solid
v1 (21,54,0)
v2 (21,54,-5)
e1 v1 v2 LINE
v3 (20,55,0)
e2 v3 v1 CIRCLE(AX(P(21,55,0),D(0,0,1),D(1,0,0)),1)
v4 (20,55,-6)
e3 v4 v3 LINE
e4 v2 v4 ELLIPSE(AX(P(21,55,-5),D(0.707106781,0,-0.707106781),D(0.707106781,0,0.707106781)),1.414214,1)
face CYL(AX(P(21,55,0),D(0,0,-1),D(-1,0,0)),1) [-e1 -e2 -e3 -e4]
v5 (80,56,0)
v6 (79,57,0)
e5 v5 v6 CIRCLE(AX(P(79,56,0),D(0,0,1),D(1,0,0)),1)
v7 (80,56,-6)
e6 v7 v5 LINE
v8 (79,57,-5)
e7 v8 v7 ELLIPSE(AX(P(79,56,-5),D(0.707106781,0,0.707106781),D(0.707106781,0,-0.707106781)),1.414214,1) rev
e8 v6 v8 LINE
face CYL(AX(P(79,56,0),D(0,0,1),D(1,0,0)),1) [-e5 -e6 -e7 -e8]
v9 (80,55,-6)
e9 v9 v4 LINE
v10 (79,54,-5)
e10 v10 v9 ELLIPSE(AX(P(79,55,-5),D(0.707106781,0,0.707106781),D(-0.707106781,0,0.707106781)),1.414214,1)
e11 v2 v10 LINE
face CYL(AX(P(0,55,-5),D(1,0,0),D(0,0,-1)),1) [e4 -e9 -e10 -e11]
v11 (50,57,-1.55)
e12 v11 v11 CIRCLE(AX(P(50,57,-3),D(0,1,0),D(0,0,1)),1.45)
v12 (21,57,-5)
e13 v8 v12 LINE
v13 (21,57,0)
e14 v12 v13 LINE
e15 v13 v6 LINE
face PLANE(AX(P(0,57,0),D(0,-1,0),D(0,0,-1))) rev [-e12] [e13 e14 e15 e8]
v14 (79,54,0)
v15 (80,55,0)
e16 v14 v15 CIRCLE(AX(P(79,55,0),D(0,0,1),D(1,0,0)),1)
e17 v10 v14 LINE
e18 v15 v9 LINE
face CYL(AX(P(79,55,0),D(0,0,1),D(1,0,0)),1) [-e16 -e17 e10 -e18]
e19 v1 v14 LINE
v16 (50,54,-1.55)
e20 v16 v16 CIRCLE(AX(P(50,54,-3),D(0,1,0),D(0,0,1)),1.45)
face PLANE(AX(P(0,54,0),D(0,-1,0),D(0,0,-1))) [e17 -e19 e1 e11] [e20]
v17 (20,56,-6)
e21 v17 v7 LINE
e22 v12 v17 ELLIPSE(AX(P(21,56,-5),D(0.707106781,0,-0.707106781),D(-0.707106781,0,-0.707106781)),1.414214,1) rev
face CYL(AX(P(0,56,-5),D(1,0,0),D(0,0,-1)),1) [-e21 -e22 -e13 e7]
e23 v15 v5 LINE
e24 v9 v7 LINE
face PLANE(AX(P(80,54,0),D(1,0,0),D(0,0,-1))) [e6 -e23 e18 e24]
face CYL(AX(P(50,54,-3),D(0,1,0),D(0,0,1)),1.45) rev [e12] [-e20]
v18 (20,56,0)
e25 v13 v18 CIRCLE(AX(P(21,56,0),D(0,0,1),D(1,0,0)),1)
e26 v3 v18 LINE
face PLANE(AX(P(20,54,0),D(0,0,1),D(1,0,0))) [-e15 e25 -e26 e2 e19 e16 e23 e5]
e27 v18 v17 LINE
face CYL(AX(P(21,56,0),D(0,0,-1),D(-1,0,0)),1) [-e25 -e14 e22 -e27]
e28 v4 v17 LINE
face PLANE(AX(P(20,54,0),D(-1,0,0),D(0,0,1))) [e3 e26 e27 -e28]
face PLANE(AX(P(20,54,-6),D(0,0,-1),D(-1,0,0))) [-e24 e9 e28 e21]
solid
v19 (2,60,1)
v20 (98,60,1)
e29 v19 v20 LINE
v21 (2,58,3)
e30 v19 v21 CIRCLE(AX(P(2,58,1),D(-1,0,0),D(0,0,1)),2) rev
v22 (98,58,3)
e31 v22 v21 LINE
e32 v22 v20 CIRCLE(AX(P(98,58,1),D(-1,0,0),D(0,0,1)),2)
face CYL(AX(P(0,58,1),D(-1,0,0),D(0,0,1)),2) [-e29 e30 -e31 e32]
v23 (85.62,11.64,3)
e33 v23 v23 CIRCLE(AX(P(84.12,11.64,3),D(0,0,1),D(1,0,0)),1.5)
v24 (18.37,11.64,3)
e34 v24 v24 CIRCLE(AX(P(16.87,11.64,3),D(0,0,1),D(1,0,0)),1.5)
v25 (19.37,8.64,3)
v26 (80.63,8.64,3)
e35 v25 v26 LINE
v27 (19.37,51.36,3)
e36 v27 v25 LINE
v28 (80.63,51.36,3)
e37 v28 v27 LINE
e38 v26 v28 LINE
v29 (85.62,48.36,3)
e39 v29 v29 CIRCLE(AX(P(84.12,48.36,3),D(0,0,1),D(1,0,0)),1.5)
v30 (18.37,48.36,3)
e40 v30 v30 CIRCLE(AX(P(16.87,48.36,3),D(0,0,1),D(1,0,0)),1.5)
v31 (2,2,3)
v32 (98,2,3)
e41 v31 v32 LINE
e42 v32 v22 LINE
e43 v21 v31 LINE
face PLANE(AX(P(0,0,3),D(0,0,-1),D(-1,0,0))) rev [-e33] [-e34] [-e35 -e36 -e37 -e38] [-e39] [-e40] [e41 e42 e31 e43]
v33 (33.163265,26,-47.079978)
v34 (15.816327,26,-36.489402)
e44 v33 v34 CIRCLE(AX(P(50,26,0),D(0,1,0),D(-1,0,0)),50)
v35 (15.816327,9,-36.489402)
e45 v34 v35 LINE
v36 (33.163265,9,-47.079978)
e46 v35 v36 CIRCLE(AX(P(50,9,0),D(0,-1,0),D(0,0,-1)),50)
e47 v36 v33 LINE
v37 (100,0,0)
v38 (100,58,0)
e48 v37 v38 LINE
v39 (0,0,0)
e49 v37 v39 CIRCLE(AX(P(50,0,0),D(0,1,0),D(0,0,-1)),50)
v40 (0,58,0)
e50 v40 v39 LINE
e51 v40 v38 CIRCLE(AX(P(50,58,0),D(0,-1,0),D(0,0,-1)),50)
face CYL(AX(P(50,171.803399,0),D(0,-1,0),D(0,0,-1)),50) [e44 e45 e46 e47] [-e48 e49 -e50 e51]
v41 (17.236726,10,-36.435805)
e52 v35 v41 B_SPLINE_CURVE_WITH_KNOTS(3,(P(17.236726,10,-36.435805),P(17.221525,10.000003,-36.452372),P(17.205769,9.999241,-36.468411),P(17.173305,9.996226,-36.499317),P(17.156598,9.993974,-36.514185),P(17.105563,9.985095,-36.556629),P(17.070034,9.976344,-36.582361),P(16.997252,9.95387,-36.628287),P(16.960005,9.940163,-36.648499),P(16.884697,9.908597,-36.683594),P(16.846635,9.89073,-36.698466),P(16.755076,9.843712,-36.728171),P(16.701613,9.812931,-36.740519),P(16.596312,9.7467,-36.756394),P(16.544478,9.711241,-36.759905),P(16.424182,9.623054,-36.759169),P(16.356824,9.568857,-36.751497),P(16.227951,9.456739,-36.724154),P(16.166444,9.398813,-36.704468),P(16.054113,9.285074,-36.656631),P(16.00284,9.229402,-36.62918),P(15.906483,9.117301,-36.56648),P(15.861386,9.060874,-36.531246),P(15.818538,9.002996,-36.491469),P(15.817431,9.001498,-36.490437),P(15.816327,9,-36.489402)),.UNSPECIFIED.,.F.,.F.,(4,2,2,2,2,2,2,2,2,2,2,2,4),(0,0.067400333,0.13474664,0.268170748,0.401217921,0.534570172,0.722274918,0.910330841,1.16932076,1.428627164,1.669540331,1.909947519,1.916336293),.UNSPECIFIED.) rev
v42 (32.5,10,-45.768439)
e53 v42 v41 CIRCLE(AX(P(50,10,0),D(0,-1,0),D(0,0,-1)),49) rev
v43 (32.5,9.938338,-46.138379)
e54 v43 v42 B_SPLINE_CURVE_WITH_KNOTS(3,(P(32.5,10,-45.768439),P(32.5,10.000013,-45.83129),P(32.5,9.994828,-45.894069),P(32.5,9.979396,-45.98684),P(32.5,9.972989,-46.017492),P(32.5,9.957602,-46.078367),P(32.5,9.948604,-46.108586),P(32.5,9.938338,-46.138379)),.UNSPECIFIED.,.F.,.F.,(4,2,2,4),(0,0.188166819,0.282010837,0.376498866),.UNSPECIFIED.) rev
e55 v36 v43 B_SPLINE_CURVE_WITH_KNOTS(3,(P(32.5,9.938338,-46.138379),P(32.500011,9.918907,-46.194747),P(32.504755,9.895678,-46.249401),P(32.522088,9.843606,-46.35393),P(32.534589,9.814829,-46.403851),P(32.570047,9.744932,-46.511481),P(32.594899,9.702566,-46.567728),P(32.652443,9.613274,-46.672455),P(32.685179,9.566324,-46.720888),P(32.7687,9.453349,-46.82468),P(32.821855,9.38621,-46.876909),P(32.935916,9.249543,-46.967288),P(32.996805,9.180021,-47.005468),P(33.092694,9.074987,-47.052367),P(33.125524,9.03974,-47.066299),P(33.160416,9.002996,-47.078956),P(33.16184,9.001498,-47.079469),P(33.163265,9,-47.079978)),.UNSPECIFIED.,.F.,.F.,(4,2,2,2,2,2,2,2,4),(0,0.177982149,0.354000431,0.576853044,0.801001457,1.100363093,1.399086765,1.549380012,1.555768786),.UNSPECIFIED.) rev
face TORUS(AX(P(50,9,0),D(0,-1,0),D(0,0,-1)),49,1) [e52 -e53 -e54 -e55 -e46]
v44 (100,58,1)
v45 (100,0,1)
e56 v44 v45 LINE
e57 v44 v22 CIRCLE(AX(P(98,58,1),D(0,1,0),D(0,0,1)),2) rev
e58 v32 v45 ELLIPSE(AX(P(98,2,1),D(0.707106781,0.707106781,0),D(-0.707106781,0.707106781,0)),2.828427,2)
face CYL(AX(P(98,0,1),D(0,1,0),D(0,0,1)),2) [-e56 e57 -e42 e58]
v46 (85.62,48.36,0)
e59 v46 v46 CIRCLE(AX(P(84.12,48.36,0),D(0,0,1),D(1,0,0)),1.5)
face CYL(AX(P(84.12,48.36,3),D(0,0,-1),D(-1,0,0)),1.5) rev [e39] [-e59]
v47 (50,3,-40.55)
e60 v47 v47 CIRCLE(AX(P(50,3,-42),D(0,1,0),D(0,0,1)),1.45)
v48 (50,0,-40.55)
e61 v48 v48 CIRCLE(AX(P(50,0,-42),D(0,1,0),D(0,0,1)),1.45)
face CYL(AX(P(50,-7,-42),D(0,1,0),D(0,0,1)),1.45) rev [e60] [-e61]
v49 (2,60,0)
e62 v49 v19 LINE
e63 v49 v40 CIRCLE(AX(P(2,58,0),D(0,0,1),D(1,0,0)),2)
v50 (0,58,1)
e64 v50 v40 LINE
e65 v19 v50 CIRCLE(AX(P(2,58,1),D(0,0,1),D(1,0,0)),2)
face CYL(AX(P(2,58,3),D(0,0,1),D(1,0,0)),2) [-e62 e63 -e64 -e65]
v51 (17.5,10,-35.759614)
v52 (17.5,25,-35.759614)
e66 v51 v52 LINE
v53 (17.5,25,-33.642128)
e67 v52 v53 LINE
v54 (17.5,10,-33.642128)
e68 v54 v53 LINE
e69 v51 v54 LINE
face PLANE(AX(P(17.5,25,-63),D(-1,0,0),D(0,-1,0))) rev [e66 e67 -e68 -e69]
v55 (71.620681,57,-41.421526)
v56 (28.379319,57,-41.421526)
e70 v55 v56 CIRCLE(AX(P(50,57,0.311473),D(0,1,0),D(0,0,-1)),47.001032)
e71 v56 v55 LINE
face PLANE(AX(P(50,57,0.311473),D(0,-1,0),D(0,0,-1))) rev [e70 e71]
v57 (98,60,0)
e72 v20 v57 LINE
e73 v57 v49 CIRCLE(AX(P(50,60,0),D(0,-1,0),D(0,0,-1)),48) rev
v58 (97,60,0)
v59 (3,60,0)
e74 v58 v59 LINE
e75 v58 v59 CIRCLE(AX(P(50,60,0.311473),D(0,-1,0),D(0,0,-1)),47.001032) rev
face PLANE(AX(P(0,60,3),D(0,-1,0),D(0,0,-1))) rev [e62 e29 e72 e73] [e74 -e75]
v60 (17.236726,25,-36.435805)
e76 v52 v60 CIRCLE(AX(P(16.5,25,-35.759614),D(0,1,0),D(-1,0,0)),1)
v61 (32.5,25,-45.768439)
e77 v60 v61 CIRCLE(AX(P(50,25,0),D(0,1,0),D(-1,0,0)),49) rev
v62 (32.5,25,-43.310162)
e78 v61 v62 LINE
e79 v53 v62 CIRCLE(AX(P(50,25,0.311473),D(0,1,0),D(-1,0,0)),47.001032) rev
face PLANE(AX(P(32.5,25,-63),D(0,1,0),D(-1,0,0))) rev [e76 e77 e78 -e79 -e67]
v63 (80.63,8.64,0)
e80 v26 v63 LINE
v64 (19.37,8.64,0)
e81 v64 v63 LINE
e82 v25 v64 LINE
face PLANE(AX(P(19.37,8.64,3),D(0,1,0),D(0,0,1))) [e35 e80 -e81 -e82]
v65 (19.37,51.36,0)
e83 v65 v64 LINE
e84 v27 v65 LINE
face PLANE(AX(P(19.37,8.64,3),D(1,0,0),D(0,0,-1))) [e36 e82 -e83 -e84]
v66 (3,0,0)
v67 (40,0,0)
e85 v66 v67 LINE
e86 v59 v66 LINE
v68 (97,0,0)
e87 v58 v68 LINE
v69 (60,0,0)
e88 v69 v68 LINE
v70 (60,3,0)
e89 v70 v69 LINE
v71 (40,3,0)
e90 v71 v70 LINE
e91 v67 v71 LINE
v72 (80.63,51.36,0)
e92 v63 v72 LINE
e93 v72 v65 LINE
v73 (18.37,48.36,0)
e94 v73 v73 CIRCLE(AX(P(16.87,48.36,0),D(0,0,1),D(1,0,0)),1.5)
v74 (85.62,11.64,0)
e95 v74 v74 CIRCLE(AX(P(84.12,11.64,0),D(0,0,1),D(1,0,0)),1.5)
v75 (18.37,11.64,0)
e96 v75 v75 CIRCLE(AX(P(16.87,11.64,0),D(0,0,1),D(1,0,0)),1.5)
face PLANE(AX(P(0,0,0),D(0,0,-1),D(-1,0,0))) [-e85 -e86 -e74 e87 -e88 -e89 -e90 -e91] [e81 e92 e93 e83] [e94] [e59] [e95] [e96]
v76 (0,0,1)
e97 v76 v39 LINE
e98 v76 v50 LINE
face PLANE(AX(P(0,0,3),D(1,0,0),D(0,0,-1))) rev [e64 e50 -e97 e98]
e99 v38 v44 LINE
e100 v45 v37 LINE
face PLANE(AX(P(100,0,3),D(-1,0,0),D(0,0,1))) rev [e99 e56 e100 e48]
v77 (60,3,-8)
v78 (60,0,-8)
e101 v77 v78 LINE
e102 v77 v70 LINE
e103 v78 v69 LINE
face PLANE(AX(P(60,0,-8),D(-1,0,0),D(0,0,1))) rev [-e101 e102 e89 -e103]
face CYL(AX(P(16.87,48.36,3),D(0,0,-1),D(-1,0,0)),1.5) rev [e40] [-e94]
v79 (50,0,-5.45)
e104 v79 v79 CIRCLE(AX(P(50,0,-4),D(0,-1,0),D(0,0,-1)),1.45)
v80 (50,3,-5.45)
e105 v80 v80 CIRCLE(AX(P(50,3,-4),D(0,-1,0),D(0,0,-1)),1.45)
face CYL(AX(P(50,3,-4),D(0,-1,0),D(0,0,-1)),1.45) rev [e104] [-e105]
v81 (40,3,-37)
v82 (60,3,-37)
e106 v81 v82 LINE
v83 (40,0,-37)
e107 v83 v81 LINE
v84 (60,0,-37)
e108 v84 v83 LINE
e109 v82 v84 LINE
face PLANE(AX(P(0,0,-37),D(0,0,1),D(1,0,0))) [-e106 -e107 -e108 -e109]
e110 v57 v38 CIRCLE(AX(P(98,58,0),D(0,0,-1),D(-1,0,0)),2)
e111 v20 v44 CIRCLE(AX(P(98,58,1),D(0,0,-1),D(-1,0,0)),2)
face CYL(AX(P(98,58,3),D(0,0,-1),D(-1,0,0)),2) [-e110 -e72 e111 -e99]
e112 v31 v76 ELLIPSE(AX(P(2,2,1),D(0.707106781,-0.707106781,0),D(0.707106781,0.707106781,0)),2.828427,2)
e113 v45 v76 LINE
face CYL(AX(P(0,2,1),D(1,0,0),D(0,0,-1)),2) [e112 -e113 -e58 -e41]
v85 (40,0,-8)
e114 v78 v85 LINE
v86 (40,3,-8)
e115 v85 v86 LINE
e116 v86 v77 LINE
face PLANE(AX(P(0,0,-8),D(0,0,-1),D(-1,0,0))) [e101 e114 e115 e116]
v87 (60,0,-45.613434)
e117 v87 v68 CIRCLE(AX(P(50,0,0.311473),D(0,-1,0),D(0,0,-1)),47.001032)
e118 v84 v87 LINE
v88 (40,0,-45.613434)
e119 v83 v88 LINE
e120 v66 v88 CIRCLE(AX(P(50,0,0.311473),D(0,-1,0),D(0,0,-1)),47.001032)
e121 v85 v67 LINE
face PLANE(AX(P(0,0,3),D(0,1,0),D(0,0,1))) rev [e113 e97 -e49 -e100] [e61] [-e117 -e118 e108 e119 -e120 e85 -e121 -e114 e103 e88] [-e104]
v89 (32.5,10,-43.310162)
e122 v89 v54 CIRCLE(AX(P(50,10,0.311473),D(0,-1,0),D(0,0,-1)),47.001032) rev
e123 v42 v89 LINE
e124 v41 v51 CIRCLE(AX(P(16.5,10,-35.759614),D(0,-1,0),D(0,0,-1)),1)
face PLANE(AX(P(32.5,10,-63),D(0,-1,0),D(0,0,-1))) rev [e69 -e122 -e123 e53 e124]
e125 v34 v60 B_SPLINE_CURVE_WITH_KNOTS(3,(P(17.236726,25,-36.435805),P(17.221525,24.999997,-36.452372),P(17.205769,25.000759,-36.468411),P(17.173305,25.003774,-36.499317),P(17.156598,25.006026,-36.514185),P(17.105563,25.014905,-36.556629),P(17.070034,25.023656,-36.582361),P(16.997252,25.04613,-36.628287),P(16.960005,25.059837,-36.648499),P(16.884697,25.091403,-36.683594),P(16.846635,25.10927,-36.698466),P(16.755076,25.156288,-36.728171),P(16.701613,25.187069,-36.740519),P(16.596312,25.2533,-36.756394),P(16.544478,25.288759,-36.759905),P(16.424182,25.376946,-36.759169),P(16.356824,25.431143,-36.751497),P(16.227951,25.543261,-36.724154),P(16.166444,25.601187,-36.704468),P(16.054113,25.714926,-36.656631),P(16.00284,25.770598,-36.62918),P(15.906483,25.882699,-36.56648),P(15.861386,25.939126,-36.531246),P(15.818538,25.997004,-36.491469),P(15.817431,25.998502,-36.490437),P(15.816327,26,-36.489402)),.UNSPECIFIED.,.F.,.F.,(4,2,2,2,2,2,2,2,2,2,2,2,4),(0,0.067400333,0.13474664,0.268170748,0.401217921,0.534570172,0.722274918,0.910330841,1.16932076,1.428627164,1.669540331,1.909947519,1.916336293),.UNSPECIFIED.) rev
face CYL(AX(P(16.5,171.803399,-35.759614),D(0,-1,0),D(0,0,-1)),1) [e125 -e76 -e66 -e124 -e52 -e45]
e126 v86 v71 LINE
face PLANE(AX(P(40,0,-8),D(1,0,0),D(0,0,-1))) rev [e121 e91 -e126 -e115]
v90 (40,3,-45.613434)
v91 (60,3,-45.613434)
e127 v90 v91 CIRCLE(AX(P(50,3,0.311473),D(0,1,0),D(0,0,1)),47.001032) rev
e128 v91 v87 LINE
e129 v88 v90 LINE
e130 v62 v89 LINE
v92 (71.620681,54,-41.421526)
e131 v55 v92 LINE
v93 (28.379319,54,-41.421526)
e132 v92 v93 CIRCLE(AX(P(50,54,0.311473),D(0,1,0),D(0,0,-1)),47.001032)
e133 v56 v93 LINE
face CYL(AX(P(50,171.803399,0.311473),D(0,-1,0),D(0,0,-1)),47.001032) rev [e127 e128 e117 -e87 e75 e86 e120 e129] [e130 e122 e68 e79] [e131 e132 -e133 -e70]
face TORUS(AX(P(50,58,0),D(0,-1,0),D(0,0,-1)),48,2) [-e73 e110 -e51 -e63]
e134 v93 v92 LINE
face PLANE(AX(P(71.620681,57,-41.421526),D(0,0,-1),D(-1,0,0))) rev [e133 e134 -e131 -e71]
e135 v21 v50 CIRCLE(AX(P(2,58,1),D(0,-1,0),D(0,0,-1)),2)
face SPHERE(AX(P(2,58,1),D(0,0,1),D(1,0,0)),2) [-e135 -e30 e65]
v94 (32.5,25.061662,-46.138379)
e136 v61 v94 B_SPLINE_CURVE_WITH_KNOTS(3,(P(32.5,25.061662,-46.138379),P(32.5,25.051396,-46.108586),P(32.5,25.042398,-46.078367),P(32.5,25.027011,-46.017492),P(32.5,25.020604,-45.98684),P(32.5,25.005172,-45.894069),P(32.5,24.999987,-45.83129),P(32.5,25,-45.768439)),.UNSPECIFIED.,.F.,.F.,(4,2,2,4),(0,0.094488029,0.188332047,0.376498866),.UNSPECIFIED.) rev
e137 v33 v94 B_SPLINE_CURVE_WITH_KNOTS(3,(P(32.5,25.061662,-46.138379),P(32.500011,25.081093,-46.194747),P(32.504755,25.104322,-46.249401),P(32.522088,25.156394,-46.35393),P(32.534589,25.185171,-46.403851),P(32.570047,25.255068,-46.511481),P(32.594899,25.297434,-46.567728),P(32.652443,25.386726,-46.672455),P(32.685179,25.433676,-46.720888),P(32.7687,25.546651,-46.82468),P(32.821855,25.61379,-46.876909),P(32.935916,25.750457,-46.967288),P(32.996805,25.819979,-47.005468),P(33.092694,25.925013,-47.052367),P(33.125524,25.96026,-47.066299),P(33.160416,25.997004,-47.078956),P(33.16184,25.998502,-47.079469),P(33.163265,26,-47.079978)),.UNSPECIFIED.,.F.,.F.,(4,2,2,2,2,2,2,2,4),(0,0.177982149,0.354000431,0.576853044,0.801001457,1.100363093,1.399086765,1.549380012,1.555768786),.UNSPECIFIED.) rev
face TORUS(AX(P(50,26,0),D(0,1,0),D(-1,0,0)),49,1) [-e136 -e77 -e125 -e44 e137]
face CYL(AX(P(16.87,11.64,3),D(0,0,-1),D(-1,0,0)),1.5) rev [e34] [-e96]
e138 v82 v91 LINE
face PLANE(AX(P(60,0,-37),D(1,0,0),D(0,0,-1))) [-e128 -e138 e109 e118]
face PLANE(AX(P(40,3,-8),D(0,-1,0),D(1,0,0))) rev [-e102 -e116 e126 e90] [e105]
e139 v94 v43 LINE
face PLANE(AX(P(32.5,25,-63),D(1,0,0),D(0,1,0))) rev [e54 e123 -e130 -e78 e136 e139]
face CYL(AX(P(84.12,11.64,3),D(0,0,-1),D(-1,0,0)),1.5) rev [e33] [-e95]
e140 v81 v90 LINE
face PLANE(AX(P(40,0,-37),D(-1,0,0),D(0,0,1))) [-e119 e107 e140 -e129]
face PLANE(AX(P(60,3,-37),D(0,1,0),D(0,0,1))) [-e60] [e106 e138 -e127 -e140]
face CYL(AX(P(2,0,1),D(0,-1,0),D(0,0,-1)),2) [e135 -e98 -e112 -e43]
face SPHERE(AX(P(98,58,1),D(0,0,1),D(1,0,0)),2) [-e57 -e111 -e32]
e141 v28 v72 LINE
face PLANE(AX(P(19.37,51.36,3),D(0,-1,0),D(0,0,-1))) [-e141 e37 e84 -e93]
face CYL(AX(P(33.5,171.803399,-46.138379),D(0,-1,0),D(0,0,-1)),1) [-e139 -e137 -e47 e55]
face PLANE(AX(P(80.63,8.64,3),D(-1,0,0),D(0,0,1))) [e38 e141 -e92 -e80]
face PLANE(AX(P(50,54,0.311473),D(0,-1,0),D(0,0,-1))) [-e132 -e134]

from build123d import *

# Parameters (mm, degrees)
SKETCH1_W                = 100
SKETCH1_H                = 60
SKETCH1_R                = 1.5
SKETCH1_W_2              = 61.26
SKETCH1_H_2              = 42.72
FRONT_FACE_DEPTH         = 3
CURVED_BCK_DEPTH         = 60
FILLET1_R                = 2
FRONT_START              = 57
SKETCH3_W                = 60
SKETCH3_H                = 6
SKETCH3_R                = 1.45
FRONT_RETAINER_DEPTH     = 3
FILLET2_R                = 1
FILLET3_R                = 1
BOSS_EXTRUDE4_START      = 54
BOSS_EXTRUDE4_DEPTH      = 3
CUT_EXTRUDE1_START       = -10
SKETCH5_W                = 15
SKETCH5_H                = 15
CUT_EXTRUDE1_DEPTH       = 53
SKETCH6_W                = 20
SKETCH6_H                = 3
BOSS_EXTRUDE5_DEPTH      = 8
SKETCH7_R                = 1.45
CUT_EXTRUDE2_DEPTH       = 3
FILLET4_R                = 2
FILLET5_R                = 1
BOSS_EXTRUDE6_DEPTH      = 10
BOSS_EXTRUDE6_DEPTH_BACK = 1
BOSS_EXTRUDE6_START      = 30
SKETCH9_W                = 20
SKETCH9_H                = 3
SKETCH10_R               = 1.45
CUT_EXTRUDE3_DEPTH       = 10


with BuildPart() as part:
    # Sketch1 → Front Face (new body)
    with BuildSketch(Plane.XY):
        with Locations((50, 30)):
            Rectangle(SKETCH1_W, SKETCH1_H)
        with Locations((84.12, 48.36)):
            Circle(SKETCH1_R, mode=Mode.SUBTRACT)
        with Locations((16.87, 48.36)):
            Circle(SKETCH1_R, mode=Mode.SUBTRACT)
        with Locations((16.87, 11.64)):
            Circle(SKETCH1_R, mode=Mode.SUBTRACT)
        with Locations((84.12, 11.64)):
            Circle(SKETCH1_R, mode=Mode.SUBTRACT)
        with Locations((50, 30)):
            Rectangle(SKETCH1_W_2, SKETCH1_H_2, mode=Mode.SUBTRACT)
    extrude(amount=FRONT_FACE_DEPTH)

    # Sketch2 → Curved bck (add)
    with BuildSketch(Plane(origin=(0, 0, 0), x_dir=(1, 0, 0), z_dir=(0, 1, 0))):
        with BuildLine():
            Line((0, 0), (3, 0))
            ThreePointArc((3, 0), (50, 46.689559336), (97, 0))
            Line((97, 0), (100, 0))
            ThreePointArc((100, 0), (50, 50), (0, 0))
        make_face()
    extrude(amount=CURVED_BCK_DEPTH)

    # Fillet1
    fillet1_edges = [part.edges().sort_by_distance(p)[0] for p in [
        (100, 30, 3),
        (50, 60, 3),
        (0, 30, 3),
        (50, 0, 3),
    ]]
    fillet(fillet1_edges, radius=FILLET1_R)

    # Sketch4 → Boss-Extrude4 (add)
    with BuildSketch(Plane(origin=(0, 0, 0), x_dir=(1, 0, 0), z_dir=(0, 1, 0)).offset(BOSS_EXTRUDE4_START)):
        with BuildLine():
            Line((71.620680917, 41.421525868), (28.379319083, 41.421525868))
            ThreePointArc((28.379319083, 41.421525868), (50, 46.689559336), (71.620680917, 41.421525868))
        make_face()
    extrude(amount=BOSS_EXTRUDE4_DEPTH)

    # Sketch5 → Cut-Extrude1 (cut)
    with BuildSketch(Plane.XY.offset(CUT_EXTRUDE1_START)):
        with Locations((25, 17.5)):
            Rectangle(SKETCH5_W, SKETCH5_H)
    extrude(amount=-CUT_EXTRUDE1_DEPTH, mode=Mode.SUBTRACT)

    # Sketch6 → Boss-Extrude5 (add)
    with BuildSketch(Plane(origin=(0, 0, 0), x_dir=(-1, 0, 0), z_dir=(0, 0, -1))):
        with Locations((-50, 1.5)):
            Rectangle(SKETCH6_W, SKETCH6_H)
    extrude(amount=BOSS_EXTRUDE5_DEPTH)

    # Sketch7 → Cut-Extrude2 (cut)
    with BuildSketch(Plane.XZ):
        with Locations(Location((50, -4, 0), (0, 0, 270))):
            Circle(SKETCH7_R)
    extrude(amount=-CUT_EXTRUDE2_DEPTH, mode=Mode.SUBTRACT)

    # Fillet4
    # the kernel refuses this fillet: 2 mm, written as the material it takes off along each edge
    with BuildSketch(Plane(origin=(98, 58, 1), x_dir=(0, 1, 0), z_dir=(1, 0, 0))) as fillet4_piece_1_section:
        Polygon((0, 0), (FILLET4_R, 0), (FILLET4_R, FILLET4_R), (0, FILLET4_R), align=None)
    fillet4_piece_1 = extrude(amount=FILLET4_R, mode=Mode.PRIVATE)
    fillet4_piece_1 = fillet4_piece_1 - Plane(origin=(98, 58, 1), x_dir=(0, -0.7071067811865475, -0.7071067811865475), z_dir=(1, 0, 0)) * Sphere(FILLET4_R, mode=Mode.PRIVATE)
    add(fillet4_piece_1, mode=Mode.SUBTRACT)
    with BuildSketch(Plane(origin=(2, 58, 1), x_dir=(0, 1, 0), z_dir=(-1, 0, 0))) as fillet4_piece_2_section:
        Polygon((0, 0), (FILLET4_R, 0), (FILLET4_R, -FILLET4_R), (0, -FILLET4_R), align=None)
    fillet4_piece_2 = extrude(amount=FILLET4_R, mode=Mode.PRIVATE)
    fillet4_piece_2 = fillet4_piece_2 - Plane(origin=(2, 58, 1), x_dir=(0, -0.7071067811865475, -0.7071067811865475), z_dir=(-1, 0, 0)) * Sphere(FILLET4_R, mode=Mode.PRIVATE)
    add(fillet4_piece_2, mode=Mode.SUBTRACT)
    with BuildSketch(Plane(origin=(50, 60, 0), x_dir=(1, 0, 0), z_dir=(0, 0, 1))) as fillet4_piece_3:
        with BuildLine():
            CenterArc((50 - FILLET4_R, -FILLET4_R), FILLET4_R, 0, 90)
            Line((50 - FILLET4_R, 0), (50, 0))
            Line((50, 0), (50, -FILLET4_R))
        make_face()
    revolve(axis=Axis((50, 60, 0), (0, 1, 0)), revolution_arc=180, mode=Mode.SUBTRACT)
    with BuildSketch(Plane(origin=(100, 60, 0), x_dir=(0, -1, 0), z_dir=(0, 0, 1))) as fillet4_piece_4:
        with BuildLine():
            CenterArc((FILLET4_R, -FILLET4_R), FILLET4_R, 90, 90)
            Line((0, -FILLET4_R), (0, 0))
            Line((0, 0), (FILLET4_R, 0))
        make_face()
    extrude(amount=1, mode=Mode.SUBTRACT)
    with BuildSketch(Plane(origin=(0, 60, 0), x_dir=(0, -1, 0), z_dir=(0, 0, 1))) as fillet4_piece_5:
        with BuildLine():
            CenterArc((FILLET4_R, FILLET4_R), FILLET4_R, 180, 90)
            Line((0, FILLET4_R), (0, 0))
            Line((0, 0), (FILLET4_R, 0))
        make_face()
    extrude(amount=1, mode=Mode.SUBTRACT)

    # Fillet5
    # the kernel refuses this fillet: 1 mm, written as the material it takes off along each edge
    with BuildSketch(Plane(origin=(50, 25, 0), x_dir=(-0.6871692739731919, 0, -0.7264973426704026), z_dir=(-0.7264973426704026, 0, 0.6871692739731919))) as fillet5_piece_1_section:
        with BuildLine():
            CenterArc((50 - FILLET5_R, -FILLET5_R), FILLET5_R, 0, 90)
            Line((50 - FILLET5_R, 0), (50, 0))
            Line((50, 0), (50, -FILLET5_R))
        make_face()
    fillet5_piece_1 = revolve(axis=Axis((50, 25, 0), (0, -1, 0)), revolution_arc=25.783978958, mode=Mode.PRIVATE)
    fillet5_piece_1 = split(fillet5_piece_1, bisect_by=Plane(origin=(17.5, 25.281244753, -42.609088652), z_dir=(1, 0, 0)), keep=Keep.TOP, mode=Mode.PRIVATE)
    fillet5_piece_1 = split(fillet5_piece_1, bisect_by=Plane(origin=(32.5, 25.281244753, -42.609088652), z_dir=(-1, 0, 0)), keep=Keep.TOP, mode=Mode.PRIVATE)
    add(fillet5_piece_1, mode=Mode.SUBTRACT)
    with BuildSketch(Plane(origin=(17.5, 25, -37.996710384), x_dir=(-0.7450513884605198, 0, 0.6670070678434014), z_dir=(0, -1, 0))) as fillet5_piece_2:
        with BuildLine():
            CenterArc((2.237210427, -0.999744631), FILLET5_R, 88.705114871, 133.131372131)
            Line((1.492159038, -1.666751699), (0, 0))
            ThreePointArc((0, 0), (1.129904256, 0.012768467), (2.259808512, 0))
        make_face()
    extrude(amount=15, mode=Mode.SUBTRACT)
    with BuildSketch(Plane(origin=(50, 10, 0), x_dir=(-0.6871692739731919, 0, -0.7264973426704026), z_dir=(-0.7264973426704026, 0, 0.6871692739731919))) as fillet5_piece_3_section:
        with BuildLine():
            CenterArc((50 - FILLET5_R, FILLET5_R), FILLET5_R, 270, 90)
            Line((50 - FILLET5_R, 0), (50, 0))
            Line((50, 0), (50, FILLET5_R))
        make_face()
    fillet5_piece_3 = revolve(axis=Axis((50, 10, 0), (0, -1, 0)), revolution_arc=25.783978958, mode=Mode.PRIVATE)
    fillet5_piece_3 = split(fillet5_piece_3, bisect_by=Plane(origin=(17.5, 9.718755246, -42.609088652), z_dir=(1, 0, 0)), keep=Keep.TOP, mode=Mode.PRIVATE)
    fillet5_piece_3 = split(fillet5_piece_3, bisect_by=Plane(origin=(32.5, 9.718755246, -42.609088652), z_dir=(-1, 0, 0)), keep=Keep.TOP, mode=Mode.PRIVATE)
    add(fillet5_piece_3, mode=Mode.SUBTRACT)
    with BuildSketch(Plane(origin=(32.5, 25, -46.837484988), x_dir=(0.9391980540607006, 0, -0.34337590953442465), z_dir=(0, -1, 0))) as fillet5_piece_4:
        with BuildLine():
            CenterArc((0.699141837, 0.999975063), FILLET5_R, 200.082686736, 70.321941643)
            Line((-0.240056217, 0.656599154), (0, 0))
            ThreePointArc((0, 0), (0.353101938, -0.001246825), (0.706203876, 0))
        make_face()
    extrude(amount=15, mode=Mode.SUBTRACT)
    with BuildSketch(Plane(origin=(17.5, 30.64952128, -37.996710384), x_dir=(-0.7450513884605213, 0, 0.6670070678433995), z_dir=(0, -1, 0))) as fillet5_piece_5a_section:
        with BuildLine():
            CenterArc((2.237210427, -0.999744631), FILLET5_R, 88.705114871, 133.131372131)
            Line((1.492159038, -1.666751699), (0, 0))
            ThreePointArc((0, 0), (1.129904256, 0.012768467), (2.259808512, 0))
        make_face()
    fillet5_piece_5a = extrude(amount=20.64952128, mode=Mode.PRIVATE)
    fillet5_piece_5a = split(fillet5_piece_5a, bisect_by=Plane(origin=(17.065734443, 25, -37.044794367), z_dir=(0, 1, 0)), keep=Keep.TOP, mode=Mode.PRIVATE)
    with BuildSketch(Plane(origin=(50, 25, 0), x_dir=(-0.6871692739731919, 0, -0.7264973426704026), z_dir=(-0.7264973426704026, 0, 0.6871692739731919))) as fillet5_piece_5b_section:
        with BuildLine():
            CenterArc((50 - FILLET5_R, -FILLET5_R), FILLET5_R, 0, 90)
            Line((50 - FILLET5_R, 0), (50, 0))
            Line((50, 0), (50, -FILLET5_R))
        make_face()
    fillet5_piece_5b = revolve(axis=Axis((50, 25, 0), (0, -1, 0)), revolution_arc=25.783978958, mode=Mode.PRIVATE)
    fillet5_piece_5b = split(fillet5_piece_5b, bisect_by=Plane(origin=(17.5, 25.237274153, -36.954673212), z_dir=(-1, 0, 0)), keep=Keep.TOP, mode=Mode.PRIVATE)
    fillet5_piece_5 = fillet5_piece_5a & fillet5_piece_5b
    add(fillet5_piece_5, mode=Mode.SUBTRACT)
    with BuildSketch(Plane(origin=(50, 25, 0), x_dir=(-0.6871692739731919, 0, -0.7264973426704026), z_dir=(-0.7264973426704026, 0, 0.6871692739731919))) as fillet5_piece_6a_section:
        with BuildLine():
            CenterArc((50 - FILLET5_R, -FILLET5_R), FILLET5_R, 0, 90)
            Line((50 - FILLET5_R, 0), (50, 0))
            Line((50, 0), (50, -FILLET5_R))
        make_face()
    fillet5_piece_6a = revolve(axis=Axis((50, 25, 0), (0, -1, 0)), revolution_arc=25.783978958, mode=Mode.PRIVATE)
    fillet5_piece_6a = split(fillet5_piece_6a, bisect_by=Plane(origin=(32.5, 25.222938774, -47.02133106), z_dir=(1, 0, 0)), keep=Keep.TOP, mode=Mode.PRIVATE)
    with BuildSketch(Plane(origin=(32.5, 26.76550969, -46.837484988), x_dir=(0.9391980540607002, 0, -0.3433759095344255), z_dir=(0, -1, 0))) as fillet5_piece_6b_section:
        with BuildLine():
            CenterArc((0.699141837, 0.999975063), FILLET5_R, 200.082686736, 70.321941643)
            Line((-0.240056217, 0.656599154), (0, 0))
            ThreePointArc((0, 0), (0.353101938, -0.001246825), (0.706203876, 0))
        make_face()
    fillet5_piece_6b = extrude(amount=16.76550969, mode=Mode.PRIVATE)
    fillet5_piece_6b = split(fillet5_piece_6b, bisect_by=Plane(origin=(32.645581665, 25, -46.738365557), z_dir=(0, 1, 0)), keep=Keep.TOP, mode=Mode.PRIVATE)
    fillet5_piece_6 = fillet5_piece_6a & fillet5_piece_6b
    add(fillet5_piece_6, mode=Mode.SUBTRACT)
    with BuildSketch(Plane(origin=(17.5, 25, -37.996710384), x_dir=(-0.7450513884605198, 0, 0.6670070678434014), z_dir=(0, -1, 0))) as fillet5_piece_7a_section:
        with BuildLine():
            CenterArc((2.237210427, -0.999744631), FILLET5_R, 88.705114871, 133.131372131)
            Line((1.492159038, -1.666751699), (0, 0))
            ThreePointArc((0, 0), (1.129904256, 0.012768467), (2.259808512, 0))
        make_face()
    fillet5_piece_7a = extrude(amount=20.64952128, mode=Mode.PRIVATE)
    fillet5_piece_7a = split(fillet5_piece_7a, bisect_by=Plane(origin=(17.065734443, 10, -37.044794367), z_dir=(0, -1, 0)), keep=Keep.TOP, mode=Mode.PRIVATE)
    with BuildSketch(Plane(origin=(50, 10, 0), x_dir=(-0.6871692739731919, 0, -0.7264973426704026), z_dir=(-0.7264973426704026, 0, 0.6871692739731919))) as fillet5_piece_7b_section:
        with BuildLine():
            CenterArc((50 - FILLET5_R, FILLET5_R), FILLET5_R, 270, 90)
            Line((50 - FILLET5_R, 0), (50, 0))
            Line((50, 0), (50, FILLET5_R))
        make_face()
    fillet5_piece_7b = revolve(axis=Axis((50, 10, 0), (0, -1, 0)), revolution_arc=25.783978958, mode=Mode.PRIVATE)
    fillet5_piece_7b = split(fillet5_piece_7b, bisect_by=Plane(origin=(17.5, 9.762725864, -36.954673145), z_dir=(-1, 0, 0)), keep=Keep.TOP, mode=Mode.PRIVATE)
    fillet5_piece_7 = fillet5_piece_7a & fillet5_piece_7b
    add(fillet5_piece_7, mode=Mode.SUBTRACT)
    with BuildSketch(Plane(origin=(50, 10, 0), x_dir=(-0.6871692739731919, 0, -0.7264973426704026), z_dir=(-0.7264973426704026, 0, 0.6871692739731919))) as fillet5_piece_8a_section:
        with BuildLine():
            CenterArc((50 - FILLET5_R, FILLET5_R), FILLET5_R, 270, 90)
            Line((50 - FILLET5_R, 0), (50, 0))
            Line((50, 0), (50, FILLET5_R))
        make_face()
    fillet5_piece_8a = revolve(axis=Axis((50, 10, 0), (0, -1, 0)), revolution_arc=25.783978958, mode=Mode.PRIVATE)
    fillet5_piece_8a = split(fillet5_piece_8a, bisect_by=Plane(origin=(32.5, 9.777061235, -47.021331079), z_dir=(1, 0, 0)), keep=Keep.TOP, mode=Mode.PRIVATE)
    with BuildSketch(Plane(origin=(32.5, 25, -46.837484988), x_dir=(0.9391980540607006, 0, -0.34337590953442465), z_dir=(0, -1, 0))) as fillet5_piece_8b_section:
        with BuildLine():
            CenterArc((0.699141837, 0.999975063), FILLET5_R, 200.082686736, 70.321941643)
            Line((-0.240056217, 0.656599154), (0, 0))
            ThreePointArc((0, 0), (0.353101938, -0.001246825), (0.706203876, 0))
        make_face()
    fillet5_piece_8b = extrude(amount=16.76550969, mode=Mode.PRIVATE)
    fillet5_piece_8b = split(fillet5_piece_8b, bisect_by=Plane(origin=(32.645581665, 10, -46.738365557), z_dir=(0, -1, 0)), keep=Keep.TOP, mode=Mode.PRIVATE)
    fillet5_piece_8 = fillet5_piece_8a & fillet5_piece_8b
    add(fillet5_piece_8, mode=Mode.SUBTRACT)

    # Sketch9 → Boss-Extrude6 (add, two sides: drawn at the far end of the back side and taken through both)
    with BuildSketch(Plane(origin=(0, 0, -8), x_dir=(-1, 0, 0), z_dir=(0, 0, -1)).offset(BOSS_EXTRUDE6_START - BOSS_EXTRUDE6_DEPTH_BACK)):
        with Locations((-50, 1.5)):
            Rectangle(SKETCH9_W, SKETCH9_H)
    extrude(amount=BOSS_EXTRUDE6_DEPTH + BOSS_EXTRUDE6_DEPTH_BACK)

    # Sketch10 → Cut-Extrude3 (cut)
    with BuildSketch(Plane(origin=(0, 3, 0), x_dir=(1, 0, 0), z_dir=(0, 1, 0))):
        with Locations(Location((50, 42, 0), (0, 0, 270))):
            Circle(SKETCH10_R)
    extrude(amount=-CUT_EXTRUDE3_DEPTH, mode=Mode.SUBTRACT)


with BuildPart() as body_2:
    # Sketch3 → Front retainer (new body)
    with BuildSketch(Plane(origin=(0, 0, 0), x_dir=(1, 0, 0), z_dir=(0, 1, 0)).offset(FRONT_START)):
        with Locations((50, 3)):
            Rectangle(SKETCH3_W, SKETCH3_H)
        with Locations(Location((50, 3, 0), (0, 0, 270))):
            Circle(SKETCH3_R, mode=Mode.SUBTRACT)
    extrude(amount=-FRONT_RETAINER_DEPTH)

    # Fillet2
    fillet2_edges = [body_2.edges().sort_by_distance(p)[0] for p in [
        (80, 54, -3),
        (50, 54, -6),
        (20, 54, -3),
    ]]
    fillet(fillet2_edges, radius=FILLET2_R)

    # Fillet3
    fillet3_edges = [body_2.edges().sort_by_distance(p)[0] for p in [
        (50, 57, -6),
        (80, 57, -3),
        (20, 57, -3),
    ]]
    fillet(fillet3_edges, radius=FILLET3_R)


solid = Compound([part.part, body_2.part])
